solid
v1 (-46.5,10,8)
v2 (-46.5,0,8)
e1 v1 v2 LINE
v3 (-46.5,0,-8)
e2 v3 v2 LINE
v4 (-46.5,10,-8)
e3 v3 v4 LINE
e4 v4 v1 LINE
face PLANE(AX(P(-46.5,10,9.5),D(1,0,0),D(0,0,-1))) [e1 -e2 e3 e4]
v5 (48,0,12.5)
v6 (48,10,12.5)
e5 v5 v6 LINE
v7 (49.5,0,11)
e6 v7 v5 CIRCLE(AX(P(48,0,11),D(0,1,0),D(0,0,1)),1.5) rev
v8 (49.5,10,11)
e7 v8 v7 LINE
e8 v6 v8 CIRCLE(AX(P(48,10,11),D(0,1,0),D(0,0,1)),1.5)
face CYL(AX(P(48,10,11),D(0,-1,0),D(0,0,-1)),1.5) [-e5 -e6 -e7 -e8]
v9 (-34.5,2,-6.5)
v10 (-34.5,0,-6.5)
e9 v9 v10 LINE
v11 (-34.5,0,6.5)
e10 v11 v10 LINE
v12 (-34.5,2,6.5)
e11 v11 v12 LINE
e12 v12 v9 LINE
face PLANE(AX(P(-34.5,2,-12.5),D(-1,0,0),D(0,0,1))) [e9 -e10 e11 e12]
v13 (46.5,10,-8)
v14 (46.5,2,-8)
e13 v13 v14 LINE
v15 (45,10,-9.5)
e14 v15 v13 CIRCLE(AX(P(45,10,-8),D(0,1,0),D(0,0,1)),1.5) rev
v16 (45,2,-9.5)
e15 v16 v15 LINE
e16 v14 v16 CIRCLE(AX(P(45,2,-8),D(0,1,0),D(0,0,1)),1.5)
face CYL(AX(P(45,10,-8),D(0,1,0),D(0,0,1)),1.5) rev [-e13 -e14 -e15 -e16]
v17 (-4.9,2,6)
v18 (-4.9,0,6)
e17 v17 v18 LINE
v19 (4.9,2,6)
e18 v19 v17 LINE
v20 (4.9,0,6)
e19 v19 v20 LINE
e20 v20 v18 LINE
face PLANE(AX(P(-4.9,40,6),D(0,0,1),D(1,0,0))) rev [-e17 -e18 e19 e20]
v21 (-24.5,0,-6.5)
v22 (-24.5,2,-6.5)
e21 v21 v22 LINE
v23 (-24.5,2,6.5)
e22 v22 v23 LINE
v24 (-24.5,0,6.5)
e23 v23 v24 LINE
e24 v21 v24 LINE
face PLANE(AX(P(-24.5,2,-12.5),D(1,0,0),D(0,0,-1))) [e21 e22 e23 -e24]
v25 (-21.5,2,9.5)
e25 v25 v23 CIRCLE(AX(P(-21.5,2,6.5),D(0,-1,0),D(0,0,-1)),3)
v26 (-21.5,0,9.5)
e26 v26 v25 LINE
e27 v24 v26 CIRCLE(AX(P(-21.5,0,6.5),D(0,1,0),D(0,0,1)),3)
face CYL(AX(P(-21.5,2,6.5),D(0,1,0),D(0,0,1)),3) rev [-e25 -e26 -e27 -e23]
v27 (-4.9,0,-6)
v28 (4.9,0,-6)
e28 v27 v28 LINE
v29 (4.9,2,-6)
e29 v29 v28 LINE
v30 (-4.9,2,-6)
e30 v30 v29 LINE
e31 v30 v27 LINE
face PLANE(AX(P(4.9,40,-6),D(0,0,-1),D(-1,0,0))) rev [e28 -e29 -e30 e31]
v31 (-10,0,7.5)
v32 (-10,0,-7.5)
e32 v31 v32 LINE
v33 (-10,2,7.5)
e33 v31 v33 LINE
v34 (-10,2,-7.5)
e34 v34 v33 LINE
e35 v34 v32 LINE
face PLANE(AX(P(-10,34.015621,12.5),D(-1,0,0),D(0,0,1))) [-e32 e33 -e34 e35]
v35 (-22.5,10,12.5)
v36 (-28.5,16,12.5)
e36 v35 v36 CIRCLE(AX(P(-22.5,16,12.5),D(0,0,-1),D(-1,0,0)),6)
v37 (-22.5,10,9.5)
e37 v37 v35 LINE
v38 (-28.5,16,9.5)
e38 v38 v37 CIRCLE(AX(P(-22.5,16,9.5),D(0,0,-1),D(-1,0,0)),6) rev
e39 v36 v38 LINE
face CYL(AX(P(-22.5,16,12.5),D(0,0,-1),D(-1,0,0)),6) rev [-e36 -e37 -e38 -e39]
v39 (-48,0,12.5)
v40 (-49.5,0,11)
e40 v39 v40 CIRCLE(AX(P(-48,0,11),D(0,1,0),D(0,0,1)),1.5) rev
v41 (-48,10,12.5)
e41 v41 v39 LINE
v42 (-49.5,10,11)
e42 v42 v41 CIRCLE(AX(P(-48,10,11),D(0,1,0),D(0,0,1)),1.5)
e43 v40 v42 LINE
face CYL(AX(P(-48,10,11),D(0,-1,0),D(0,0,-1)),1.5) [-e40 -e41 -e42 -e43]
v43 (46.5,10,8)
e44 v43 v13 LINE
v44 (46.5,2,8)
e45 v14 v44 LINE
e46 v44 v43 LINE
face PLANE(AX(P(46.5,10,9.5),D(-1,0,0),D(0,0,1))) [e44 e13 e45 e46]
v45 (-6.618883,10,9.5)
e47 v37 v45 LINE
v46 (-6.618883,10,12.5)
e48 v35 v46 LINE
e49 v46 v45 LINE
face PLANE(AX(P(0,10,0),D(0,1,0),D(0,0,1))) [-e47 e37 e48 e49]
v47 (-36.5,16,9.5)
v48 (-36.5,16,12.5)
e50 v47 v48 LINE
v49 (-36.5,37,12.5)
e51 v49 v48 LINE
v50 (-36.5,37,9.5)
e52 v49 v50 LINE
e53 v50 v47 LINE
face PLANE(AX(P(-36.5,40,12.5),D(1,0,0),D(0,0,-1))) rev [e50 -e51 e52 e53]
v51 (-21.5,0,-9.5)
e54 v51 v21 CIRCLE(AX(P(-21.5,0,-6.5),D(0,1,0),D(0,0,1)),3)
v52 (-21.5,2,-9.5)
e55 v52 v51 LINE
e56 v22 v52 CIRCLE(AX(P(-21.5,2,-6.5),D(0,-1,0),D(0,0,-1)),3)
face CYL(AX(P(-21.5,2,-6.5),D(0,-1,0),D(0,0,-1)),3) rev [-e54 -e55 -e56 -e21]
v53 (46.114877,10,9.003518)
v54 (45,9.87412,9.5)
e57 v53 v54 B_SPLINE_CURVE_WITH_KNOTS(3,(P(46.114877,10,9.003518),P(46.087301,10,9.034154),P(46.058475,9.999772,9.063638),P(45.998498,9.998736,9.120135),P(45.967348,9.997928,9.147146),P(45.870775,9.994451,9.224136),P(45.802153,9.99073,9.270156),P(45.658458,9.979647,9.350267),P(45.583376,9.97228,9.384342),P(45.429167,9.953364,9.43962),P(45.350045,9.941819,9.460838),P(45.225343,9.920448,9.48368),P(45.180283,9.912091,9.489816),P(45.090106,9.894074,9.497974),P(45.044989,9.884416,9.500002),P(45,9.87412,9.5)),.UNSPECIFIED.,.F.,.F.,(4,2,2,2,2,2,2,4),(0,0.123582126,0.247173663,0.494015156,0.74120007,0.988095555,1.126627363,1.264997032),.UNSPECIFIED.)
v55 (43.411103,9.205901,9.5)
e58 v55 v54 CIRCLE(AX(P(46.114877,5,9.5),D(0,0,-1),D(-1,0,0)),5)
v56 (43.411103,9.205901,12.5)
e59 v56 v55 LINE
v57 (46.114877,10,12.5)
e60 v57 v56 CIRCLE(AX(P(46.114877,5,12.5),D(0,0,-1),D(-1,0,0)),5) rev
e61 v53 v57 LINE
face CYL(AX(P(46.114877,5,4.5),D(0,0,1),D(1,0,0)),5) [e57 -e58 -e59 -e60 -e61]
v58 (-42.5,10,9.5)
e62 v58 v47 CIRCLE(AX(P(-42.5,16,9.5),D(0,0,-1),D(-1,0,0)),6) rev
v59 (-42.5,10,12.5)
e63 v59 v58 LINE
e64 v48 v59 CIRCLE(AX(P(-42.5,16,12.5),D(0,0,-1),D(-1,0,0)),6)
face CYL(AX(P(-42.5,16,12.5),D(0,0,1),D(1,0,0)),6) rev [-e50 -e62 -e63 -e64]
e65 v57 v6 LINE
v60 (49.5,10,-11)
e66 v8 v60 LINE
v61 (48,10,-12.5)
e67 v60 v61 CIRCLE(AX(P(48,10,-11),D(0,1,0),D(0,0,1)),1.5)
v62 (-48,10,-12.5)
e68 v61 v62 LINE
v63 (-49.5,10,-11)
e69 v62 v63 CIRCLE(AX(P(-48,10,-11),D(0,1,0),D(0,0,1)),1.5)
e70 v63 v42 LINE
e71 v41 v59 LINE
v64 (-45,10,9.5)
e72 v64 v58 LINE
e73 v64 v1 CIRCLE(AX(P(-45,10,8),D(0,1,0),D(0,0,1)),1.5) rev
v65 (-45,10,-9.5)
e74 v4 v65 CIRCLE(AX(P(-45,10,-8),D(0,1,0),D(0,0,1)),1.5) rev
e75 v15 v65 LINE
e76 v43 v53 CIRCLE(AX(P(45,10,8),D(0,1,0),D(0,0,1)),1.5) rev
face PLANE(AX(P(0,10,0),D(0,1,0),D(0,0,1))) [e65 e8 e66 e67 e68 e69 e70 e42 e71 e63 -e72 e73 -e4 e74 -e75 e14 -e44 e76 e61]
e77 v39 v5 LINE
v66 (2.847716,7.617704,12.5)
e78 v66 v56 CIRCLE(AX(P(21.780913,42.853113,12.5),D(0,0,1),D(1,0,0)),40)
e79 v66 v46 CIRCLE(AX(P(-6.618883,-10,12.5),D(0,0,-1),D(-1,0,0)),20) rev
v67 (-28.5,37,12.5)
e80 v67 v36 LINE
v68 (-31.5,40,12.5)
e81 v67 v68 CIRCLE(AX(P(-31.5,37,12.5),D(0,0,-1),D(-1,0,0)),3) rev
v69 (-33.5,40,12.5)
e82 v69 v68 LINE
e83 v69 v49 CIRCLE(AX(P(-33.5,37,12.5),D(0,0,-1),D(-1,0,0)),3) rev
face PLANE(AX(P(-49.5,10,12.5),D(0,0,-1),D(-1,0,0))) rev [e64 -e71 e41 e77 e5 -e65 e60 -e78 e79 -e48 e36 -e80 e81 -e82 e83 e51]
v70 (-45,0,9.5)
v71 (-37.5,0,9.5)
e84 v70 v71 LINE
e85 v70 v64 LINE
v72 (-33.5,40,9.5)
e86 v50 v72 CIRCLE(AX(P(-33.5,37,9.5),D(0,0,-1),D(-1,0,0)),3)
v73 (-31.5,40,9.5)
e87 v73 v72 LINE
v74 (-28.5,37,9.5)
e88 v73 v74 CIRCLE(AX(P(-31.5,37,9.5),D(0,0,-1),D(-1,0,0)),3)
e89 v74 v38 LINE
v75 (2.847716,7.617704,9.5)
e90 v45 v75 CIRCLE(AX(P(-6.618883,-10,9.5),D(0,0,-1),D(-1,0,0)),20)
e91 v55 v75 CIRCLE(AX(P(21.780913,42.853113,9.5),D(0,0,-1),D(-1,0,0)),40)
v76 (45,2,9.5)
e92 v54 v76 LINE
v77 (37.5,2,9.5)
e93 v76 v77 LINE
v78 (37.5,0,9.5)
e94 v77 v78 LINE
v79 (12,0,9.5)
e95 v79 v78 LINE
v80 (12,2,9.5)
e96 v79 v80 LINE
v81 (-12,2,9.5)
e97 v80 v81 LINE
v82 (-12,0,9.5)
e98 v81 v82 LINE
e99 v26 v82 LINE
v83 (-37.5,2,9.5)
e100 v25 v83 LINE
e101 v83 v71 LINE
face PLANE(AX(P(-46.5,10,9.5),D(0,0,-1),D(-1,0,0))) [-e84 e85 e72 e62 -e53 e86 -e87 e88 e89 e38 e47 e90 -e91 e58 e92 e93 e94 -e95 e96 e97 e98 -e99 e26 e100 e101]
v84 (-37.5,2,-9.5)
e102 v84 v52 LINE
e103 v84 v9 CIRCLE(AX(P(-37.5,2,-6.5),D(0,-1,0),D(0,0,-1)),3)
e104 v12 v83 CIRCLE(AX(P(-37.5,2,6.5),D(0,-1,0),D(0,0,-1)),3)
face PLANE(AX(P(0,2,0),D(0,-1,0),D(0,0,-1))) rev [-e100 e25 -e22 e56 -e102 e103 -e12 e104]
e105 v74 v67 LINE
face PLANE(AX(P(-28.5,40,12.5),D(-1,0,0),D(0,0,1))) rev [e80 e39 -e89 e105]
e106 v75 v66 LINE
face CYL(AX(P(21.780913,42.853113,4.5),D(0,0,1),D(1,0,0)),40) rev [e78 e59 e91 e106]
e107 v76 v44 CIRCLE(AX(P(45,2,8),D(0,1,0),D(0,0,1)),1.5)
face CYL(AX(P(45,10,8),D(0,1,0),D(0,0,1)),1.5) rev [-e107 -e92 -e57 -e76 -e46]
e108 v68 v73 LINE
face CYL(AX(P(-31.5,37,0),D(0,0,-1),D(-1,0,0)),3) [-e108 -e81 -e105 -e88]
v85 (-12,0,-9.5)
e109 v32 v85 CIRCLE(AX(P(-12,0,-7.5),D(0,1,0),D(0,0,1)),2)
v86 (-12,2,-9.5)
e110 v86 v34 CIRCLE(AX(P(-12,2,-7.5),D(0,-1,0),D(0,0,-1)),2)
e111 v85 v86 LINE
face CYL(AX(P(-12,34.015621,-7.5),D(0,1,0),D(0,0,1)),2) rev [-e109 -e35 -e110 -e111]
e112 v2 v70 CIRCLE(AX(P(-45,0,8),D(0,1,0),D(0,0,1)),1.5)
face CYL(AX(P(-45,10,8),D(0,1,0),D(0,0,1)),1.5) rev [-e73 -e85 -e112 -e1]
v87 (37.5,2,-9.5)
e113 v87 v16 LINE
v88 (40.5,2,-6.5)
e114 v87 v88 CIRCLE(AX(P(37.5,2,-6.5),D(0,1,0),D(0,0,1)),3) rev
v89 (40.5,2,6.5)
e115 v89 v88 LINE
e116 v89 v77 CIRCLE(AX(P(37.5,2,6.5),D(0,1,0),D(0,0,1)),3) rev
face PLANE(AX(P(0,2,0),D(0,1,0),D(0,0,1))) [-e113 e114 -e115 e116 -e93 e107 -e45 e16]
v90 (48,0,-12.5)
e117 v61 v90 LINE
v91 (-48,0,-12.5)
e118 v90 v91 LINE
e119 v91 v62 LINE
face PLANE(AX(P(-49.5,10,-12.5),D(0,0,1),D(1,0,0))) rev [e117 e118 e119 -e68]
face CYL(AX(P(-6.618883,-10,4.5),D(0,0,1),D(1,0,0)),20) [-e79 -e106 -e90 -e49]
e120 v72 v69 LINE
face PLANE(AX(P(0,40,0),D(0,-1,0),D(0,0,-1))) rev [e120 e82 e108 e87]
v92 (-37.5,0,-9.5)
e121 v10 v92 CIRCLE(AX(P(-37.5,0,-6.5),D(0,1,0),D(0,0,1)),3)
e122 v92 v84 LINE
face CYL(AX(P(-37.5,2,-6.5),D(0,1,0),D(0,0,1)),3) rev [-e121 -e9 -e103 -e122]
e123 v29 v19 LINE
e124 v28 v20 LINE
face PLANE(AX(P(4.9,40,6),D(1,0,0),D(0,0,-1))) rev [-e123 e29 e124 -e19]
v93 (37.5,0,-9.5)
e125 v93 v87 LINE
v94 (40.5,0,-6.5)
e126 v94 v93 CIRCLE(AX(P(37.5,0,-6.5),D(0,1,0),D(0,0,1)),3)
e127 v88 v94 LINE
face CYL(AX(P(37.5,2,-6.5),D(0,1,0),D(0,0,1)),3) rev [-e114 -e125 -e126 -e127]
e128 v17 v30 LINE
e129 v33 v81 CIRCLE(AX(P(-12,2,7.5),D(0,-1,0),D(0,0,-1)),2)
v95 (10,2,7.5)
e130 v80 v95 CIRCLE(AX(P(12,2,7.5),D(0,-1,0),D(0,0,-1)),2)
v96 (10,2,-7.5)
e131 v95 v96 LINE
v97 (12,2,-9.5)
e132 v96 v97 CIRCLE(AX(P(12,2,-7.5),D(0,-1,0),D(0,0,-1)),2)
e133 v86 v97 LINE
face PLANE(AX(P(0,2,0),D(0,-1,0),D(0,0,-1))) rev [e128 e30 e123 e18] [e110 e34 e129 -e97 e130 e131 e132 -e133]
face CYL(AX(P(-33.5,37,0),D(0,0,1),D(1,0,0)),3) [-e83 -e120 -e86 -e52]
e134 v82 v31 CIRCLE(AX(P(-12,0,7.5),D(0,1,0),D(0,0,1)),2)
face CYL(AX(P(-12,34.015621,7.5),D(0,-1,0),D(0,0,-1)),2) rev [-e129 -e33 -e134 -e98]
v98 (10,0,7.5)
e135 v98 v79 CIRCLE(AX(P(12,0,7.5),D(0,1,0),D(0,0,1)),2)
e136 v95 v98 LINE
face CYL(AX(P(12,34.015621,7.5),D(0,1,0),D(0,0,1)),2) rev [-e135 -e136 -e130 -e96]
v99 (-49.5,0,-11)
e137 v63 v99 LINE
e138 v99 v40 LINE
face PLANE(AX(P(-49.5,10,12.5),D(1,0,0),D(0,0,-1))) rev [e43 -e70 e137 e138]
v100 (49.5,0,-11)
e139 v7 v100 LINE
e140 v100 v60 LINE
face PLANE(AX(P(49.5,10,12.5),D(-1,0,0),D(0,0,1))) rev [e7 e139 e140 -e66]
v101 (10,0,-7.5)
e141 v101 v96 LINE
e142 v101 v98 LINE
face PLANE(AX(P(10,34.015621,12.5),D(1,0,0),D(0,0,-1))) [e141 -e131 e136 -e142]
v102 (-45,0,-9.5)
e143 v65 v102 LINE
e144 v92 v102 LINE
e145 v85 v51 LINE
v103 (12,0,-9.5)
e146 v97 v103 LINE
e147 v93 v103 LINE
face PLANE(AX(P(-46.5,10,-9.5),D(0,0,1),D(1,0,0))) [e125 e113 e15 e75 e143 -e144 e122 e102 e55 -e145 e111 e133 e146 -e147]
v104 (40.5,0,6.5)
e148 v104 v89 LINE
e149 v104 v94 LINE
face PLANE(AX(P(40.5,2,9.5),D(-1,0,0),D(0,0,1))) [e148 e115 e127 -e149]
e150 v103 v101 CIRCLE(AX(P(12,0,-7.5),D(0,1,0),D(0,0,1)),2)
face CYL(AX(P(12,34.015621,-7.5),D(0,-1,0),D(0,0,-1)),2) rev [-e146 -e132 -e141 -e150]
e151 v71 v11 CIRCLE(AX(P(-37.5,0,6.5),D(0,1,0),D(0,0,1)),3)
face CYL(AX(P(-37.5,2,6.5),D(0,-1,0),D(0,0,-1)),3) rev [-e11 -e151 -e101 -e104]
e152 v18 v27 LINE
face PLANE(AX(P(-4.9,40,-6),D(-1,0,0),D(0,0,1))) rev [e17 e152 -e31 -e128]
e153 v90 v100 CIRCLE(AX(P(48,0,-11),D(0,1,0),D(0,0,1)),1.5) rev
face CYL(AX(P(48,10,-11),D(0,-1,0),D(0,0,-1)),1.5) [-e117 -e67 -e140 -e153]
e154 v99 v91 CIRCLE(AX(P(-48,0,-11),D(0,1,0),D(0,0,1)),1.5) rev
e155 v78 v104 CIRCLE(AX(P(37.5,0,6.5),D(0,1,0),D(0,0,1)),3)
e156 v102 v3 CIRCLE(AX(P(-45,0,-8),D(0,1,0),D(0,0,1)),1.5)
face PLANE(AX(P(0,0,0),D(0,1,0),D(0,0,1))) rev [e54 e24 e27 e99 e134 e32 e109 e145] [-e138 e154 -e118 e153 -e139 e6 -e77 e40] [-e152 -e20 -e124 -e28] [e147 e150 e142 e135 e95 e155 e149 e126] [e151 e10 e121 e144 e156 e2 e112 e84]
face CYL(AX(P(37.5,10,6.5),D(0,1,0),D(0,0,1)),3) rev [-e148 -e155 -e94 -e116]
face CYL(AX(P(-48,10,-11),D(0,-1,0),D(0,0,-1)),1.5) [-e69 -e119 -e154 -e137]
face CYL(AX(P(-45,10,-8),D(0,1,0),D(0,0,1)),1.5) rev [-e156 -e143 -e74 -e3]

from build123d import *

# Parameters (mm, degrees)
SKETCH1_W               = 99
SKETCH1_H               = 25
SKETCH1_W_2             = 93
SKETCH1_H_2             = 19
BOSS_EXTRUDE1_DEPTH     = 10
SKETCH2_R               = 40
CUT_EXTRUDE1_DEPTH      = 8
SKETCH5_W               = 10
SKETCH5_H               = 25
BOSS_EXTRUDE5_DEPTH     = 2
SKETCH6_W               = 6
SKETCH6_H               = 19
BOSS_EXTRUDE6_DEPTH     = 2
SKETCH7_W               = 8
SKETCH7_H               = 3
BOSS_EXTRUDE7_DEPTH     = 30
FILLET5_R               = 3
FILLET7_R               = 5
FILLET8_R               = 20
FILLET9_R               = 1.5
FILLET10_R              = 6
FILLET11_R              = 3
SKETCH8_W               = 20
SKETCH8_H               = 25
BOSS_EXTRUDE8_DEPTH     = 2
SKETCH9_W               = 9.8
SKETCH9_H               = 12
BOSS_EXTRUDE9_DEPTH     = 10
SKETCH10_R              = 2
CUT_EXTRUDE2_DEPTH      = 23
FILLET12_R              = 6
CUT_EXTRUDE5_DEPTH      = 65.857536204
CUT_EXTRUDE5_DEPTH_BACK = 65.857536204
SKETCH12_W              = 9.8
SKETCH12_H              = 12
FILLET13_R              = 2


with BuildPart() as part:
    # Sketch1 → Boss-Extrude1 (new body)
    with BuildSketch(Plane(origin=(0, 0, 0), x_dir=(1, 0, 0), z_dir=(0, 1, 0))):
        Rectangle(SKETCH1_W, SKETCH1_H)
        Rectangle(SKETCH1_W_2, SKETCH1_H_2, mode=Mode.SUBTRACT)
    extrude(amount=BOSS_EXTRUDE1_DEPTH)

    # Sketch2 → Cut-Extrude1 (cut)
    with BuildSketch(Plane.XY.offset(12.5)):
        with Locations((21.780912994, 42.853113242)):
            Circle(SKETCH2_R)
    extrude(amount=-CUT_EXTRUDE1_DEPTH, mode=Mode.SUBTRACT)

    # Sketch5 → Boss-Extrude5 (add)
    with BuildSketch(Plane.XZ):
        with Locations((-29.5, 0)):
            Rectangle(SKETCH5_W, SKETCH5_H)
    extrude(amount=-BOSS_EXTRUDE5_DEPTH)

    # Sketch6 → Boss-Extrude6 (add)
    with BuildSketch(Plane.XZ):
        with Locations((43.5, 0)):
            Rectangle(SKETCH6_W, SKETCH6_H)
    extrude(amount=-BOSS_EXTRUDE6_DEPTH)

    # Sketch7 → Boss-Extrude7 (add)
    with BuildSketch(Plane(origin=(0, 10, 0), x_dir=(1, 0, 0), z_dir=(0, 1, 0))):
        with Locations((-32.5, -11)):
            Rectangle(SKETCH7_W, SKETCH7_H)
    extrude(amount=BOSS_EXTRUDE7_DEPTH)

    # Fillet5
    fillet5_edges = [part.edges().sort_by_distance(p)[0] for p in [
        (-34.5, 1, 9.5),
        (-24.5, 1, 9.5),
        (-24.5, 1, -9.5),
        (-34.5, 1, -9.5),
        (40.5, 1, -9.5),
        (40.5, 1, 9.5),
    ]]
    fillet(fillet5_edges, radius=FILLET5_R)

    # Fillet7
    fillet7_edges = [part.edges().sort_by_distance(p)[0] for p in [
        (44.599172136, 10, 11),
    ]]
    fillet(fillet7_edges, radius=FILLET7_R)

    # Fillet8
    fillet8_edges = [part.edges().sort_by_distance(p)[0] for p in [
        (-1.037346149, 10, 11),
    ]]
    fillet(fillet8_edges, radius=FILLET8_R)

    # Fillet9
    fillet9_edges = [part.edges().sort_by_distance(p)[0] for p in [
        (46.5, 6, 9.5),
        (46.5, 6, -9.5),
        (-46.5, 5, -9.5),
        (-46.5, 5, 9.5),
        (-49.5, 5, 12.5),
        (-49.5, 5, -12.5),
        (49.5, 5, -12.5),
        (49.5, 5, 12.5),
    ]]
    fillet(fillet9_edges, radius=FILLET9_R)

    # Fillet10
    fillet10_edges = [part.edges().sort_by_distance(p)[0] for p in [
        (-36.5, 10, 11),
        (-28.5, 10, 11),
    ]]
    fillet(fillet10_edges, radius=FILLET10_R)

    # Fillet11
    fillet11_edges = [part.edges().sort_by_distance(p)[0] for p in [
        (-36.5, 40, 11),
        (-28.5, 40, 11),
    ]]
    fillet(fillet11_edges, radius=FILLET11_R)

    # Sketch8 → Boss-Extrude8 (add)
    with BuildSketch(Plane.XZ):
        Rectangle(SKETCH8_W, SKETCH8_H)
    extrude(amount=-BOSS_EXTRUDE8_DEPTH)

    # Sketch9 → Boss-Extrude9 (add)
    with BuildSketch(Plane.XZ):
        Rectangle(SKETCH9_W, SKETCH9_H)
    extrude(amount=BOSS_EXTRUDE9_DEPTH)

    # Sketch10 → Cut-Extrude2 (cut)
    with BuildSketch(Plane(origin=(4.9, 0, 0), x_dir=(0, 0, -1), z_dir=(1, 0, 0))):
        with Locations((0, -5)):
            Circle(SKETCH10_R)
    extrude(amount=-CUT_EXTRUDE2_DEPTH, mode=Mode.SUBTRACT)

    # Fillet12
    fillet12_edges = [part.edges().sort_by_distance(p)[0] for p in [
        (0, -10, 6),
        (0, -10, -6),
    ]]
    fillet(fillet12_edges, radius=FILLET12_R - 0.0001)  # a hair under: the kernel refuses the full size

    # Sketch12 → Cut-Extrude5 (cut, two sides: drawn at the far end of the back side and taken through both)
    with BuildSketch(Plane.XZ.offset(-CUT_EXTRUDE5_DEPTH_BACK)):
        Rectangle(SKETCH12_W, SKETCH12_H)
    extrude(amount=CUT_EXTRUDE5_DEPTH + CUT_EXTRUDE5_DEPTH_BACK, mode=Mode.SUBTRACT)

    # Fillet13
    fillet13_edges = [part.edges().sort_by_distance(p)[0] for p in [
        (-10, 1, 9.5),
        (10, 1, 9.5),
        (10, 1, -9.5),
        (-10, 1, -9.5),
    ]]
    fillet(fillet13_edges, radius=FILLET13_R)


solid = part.part
